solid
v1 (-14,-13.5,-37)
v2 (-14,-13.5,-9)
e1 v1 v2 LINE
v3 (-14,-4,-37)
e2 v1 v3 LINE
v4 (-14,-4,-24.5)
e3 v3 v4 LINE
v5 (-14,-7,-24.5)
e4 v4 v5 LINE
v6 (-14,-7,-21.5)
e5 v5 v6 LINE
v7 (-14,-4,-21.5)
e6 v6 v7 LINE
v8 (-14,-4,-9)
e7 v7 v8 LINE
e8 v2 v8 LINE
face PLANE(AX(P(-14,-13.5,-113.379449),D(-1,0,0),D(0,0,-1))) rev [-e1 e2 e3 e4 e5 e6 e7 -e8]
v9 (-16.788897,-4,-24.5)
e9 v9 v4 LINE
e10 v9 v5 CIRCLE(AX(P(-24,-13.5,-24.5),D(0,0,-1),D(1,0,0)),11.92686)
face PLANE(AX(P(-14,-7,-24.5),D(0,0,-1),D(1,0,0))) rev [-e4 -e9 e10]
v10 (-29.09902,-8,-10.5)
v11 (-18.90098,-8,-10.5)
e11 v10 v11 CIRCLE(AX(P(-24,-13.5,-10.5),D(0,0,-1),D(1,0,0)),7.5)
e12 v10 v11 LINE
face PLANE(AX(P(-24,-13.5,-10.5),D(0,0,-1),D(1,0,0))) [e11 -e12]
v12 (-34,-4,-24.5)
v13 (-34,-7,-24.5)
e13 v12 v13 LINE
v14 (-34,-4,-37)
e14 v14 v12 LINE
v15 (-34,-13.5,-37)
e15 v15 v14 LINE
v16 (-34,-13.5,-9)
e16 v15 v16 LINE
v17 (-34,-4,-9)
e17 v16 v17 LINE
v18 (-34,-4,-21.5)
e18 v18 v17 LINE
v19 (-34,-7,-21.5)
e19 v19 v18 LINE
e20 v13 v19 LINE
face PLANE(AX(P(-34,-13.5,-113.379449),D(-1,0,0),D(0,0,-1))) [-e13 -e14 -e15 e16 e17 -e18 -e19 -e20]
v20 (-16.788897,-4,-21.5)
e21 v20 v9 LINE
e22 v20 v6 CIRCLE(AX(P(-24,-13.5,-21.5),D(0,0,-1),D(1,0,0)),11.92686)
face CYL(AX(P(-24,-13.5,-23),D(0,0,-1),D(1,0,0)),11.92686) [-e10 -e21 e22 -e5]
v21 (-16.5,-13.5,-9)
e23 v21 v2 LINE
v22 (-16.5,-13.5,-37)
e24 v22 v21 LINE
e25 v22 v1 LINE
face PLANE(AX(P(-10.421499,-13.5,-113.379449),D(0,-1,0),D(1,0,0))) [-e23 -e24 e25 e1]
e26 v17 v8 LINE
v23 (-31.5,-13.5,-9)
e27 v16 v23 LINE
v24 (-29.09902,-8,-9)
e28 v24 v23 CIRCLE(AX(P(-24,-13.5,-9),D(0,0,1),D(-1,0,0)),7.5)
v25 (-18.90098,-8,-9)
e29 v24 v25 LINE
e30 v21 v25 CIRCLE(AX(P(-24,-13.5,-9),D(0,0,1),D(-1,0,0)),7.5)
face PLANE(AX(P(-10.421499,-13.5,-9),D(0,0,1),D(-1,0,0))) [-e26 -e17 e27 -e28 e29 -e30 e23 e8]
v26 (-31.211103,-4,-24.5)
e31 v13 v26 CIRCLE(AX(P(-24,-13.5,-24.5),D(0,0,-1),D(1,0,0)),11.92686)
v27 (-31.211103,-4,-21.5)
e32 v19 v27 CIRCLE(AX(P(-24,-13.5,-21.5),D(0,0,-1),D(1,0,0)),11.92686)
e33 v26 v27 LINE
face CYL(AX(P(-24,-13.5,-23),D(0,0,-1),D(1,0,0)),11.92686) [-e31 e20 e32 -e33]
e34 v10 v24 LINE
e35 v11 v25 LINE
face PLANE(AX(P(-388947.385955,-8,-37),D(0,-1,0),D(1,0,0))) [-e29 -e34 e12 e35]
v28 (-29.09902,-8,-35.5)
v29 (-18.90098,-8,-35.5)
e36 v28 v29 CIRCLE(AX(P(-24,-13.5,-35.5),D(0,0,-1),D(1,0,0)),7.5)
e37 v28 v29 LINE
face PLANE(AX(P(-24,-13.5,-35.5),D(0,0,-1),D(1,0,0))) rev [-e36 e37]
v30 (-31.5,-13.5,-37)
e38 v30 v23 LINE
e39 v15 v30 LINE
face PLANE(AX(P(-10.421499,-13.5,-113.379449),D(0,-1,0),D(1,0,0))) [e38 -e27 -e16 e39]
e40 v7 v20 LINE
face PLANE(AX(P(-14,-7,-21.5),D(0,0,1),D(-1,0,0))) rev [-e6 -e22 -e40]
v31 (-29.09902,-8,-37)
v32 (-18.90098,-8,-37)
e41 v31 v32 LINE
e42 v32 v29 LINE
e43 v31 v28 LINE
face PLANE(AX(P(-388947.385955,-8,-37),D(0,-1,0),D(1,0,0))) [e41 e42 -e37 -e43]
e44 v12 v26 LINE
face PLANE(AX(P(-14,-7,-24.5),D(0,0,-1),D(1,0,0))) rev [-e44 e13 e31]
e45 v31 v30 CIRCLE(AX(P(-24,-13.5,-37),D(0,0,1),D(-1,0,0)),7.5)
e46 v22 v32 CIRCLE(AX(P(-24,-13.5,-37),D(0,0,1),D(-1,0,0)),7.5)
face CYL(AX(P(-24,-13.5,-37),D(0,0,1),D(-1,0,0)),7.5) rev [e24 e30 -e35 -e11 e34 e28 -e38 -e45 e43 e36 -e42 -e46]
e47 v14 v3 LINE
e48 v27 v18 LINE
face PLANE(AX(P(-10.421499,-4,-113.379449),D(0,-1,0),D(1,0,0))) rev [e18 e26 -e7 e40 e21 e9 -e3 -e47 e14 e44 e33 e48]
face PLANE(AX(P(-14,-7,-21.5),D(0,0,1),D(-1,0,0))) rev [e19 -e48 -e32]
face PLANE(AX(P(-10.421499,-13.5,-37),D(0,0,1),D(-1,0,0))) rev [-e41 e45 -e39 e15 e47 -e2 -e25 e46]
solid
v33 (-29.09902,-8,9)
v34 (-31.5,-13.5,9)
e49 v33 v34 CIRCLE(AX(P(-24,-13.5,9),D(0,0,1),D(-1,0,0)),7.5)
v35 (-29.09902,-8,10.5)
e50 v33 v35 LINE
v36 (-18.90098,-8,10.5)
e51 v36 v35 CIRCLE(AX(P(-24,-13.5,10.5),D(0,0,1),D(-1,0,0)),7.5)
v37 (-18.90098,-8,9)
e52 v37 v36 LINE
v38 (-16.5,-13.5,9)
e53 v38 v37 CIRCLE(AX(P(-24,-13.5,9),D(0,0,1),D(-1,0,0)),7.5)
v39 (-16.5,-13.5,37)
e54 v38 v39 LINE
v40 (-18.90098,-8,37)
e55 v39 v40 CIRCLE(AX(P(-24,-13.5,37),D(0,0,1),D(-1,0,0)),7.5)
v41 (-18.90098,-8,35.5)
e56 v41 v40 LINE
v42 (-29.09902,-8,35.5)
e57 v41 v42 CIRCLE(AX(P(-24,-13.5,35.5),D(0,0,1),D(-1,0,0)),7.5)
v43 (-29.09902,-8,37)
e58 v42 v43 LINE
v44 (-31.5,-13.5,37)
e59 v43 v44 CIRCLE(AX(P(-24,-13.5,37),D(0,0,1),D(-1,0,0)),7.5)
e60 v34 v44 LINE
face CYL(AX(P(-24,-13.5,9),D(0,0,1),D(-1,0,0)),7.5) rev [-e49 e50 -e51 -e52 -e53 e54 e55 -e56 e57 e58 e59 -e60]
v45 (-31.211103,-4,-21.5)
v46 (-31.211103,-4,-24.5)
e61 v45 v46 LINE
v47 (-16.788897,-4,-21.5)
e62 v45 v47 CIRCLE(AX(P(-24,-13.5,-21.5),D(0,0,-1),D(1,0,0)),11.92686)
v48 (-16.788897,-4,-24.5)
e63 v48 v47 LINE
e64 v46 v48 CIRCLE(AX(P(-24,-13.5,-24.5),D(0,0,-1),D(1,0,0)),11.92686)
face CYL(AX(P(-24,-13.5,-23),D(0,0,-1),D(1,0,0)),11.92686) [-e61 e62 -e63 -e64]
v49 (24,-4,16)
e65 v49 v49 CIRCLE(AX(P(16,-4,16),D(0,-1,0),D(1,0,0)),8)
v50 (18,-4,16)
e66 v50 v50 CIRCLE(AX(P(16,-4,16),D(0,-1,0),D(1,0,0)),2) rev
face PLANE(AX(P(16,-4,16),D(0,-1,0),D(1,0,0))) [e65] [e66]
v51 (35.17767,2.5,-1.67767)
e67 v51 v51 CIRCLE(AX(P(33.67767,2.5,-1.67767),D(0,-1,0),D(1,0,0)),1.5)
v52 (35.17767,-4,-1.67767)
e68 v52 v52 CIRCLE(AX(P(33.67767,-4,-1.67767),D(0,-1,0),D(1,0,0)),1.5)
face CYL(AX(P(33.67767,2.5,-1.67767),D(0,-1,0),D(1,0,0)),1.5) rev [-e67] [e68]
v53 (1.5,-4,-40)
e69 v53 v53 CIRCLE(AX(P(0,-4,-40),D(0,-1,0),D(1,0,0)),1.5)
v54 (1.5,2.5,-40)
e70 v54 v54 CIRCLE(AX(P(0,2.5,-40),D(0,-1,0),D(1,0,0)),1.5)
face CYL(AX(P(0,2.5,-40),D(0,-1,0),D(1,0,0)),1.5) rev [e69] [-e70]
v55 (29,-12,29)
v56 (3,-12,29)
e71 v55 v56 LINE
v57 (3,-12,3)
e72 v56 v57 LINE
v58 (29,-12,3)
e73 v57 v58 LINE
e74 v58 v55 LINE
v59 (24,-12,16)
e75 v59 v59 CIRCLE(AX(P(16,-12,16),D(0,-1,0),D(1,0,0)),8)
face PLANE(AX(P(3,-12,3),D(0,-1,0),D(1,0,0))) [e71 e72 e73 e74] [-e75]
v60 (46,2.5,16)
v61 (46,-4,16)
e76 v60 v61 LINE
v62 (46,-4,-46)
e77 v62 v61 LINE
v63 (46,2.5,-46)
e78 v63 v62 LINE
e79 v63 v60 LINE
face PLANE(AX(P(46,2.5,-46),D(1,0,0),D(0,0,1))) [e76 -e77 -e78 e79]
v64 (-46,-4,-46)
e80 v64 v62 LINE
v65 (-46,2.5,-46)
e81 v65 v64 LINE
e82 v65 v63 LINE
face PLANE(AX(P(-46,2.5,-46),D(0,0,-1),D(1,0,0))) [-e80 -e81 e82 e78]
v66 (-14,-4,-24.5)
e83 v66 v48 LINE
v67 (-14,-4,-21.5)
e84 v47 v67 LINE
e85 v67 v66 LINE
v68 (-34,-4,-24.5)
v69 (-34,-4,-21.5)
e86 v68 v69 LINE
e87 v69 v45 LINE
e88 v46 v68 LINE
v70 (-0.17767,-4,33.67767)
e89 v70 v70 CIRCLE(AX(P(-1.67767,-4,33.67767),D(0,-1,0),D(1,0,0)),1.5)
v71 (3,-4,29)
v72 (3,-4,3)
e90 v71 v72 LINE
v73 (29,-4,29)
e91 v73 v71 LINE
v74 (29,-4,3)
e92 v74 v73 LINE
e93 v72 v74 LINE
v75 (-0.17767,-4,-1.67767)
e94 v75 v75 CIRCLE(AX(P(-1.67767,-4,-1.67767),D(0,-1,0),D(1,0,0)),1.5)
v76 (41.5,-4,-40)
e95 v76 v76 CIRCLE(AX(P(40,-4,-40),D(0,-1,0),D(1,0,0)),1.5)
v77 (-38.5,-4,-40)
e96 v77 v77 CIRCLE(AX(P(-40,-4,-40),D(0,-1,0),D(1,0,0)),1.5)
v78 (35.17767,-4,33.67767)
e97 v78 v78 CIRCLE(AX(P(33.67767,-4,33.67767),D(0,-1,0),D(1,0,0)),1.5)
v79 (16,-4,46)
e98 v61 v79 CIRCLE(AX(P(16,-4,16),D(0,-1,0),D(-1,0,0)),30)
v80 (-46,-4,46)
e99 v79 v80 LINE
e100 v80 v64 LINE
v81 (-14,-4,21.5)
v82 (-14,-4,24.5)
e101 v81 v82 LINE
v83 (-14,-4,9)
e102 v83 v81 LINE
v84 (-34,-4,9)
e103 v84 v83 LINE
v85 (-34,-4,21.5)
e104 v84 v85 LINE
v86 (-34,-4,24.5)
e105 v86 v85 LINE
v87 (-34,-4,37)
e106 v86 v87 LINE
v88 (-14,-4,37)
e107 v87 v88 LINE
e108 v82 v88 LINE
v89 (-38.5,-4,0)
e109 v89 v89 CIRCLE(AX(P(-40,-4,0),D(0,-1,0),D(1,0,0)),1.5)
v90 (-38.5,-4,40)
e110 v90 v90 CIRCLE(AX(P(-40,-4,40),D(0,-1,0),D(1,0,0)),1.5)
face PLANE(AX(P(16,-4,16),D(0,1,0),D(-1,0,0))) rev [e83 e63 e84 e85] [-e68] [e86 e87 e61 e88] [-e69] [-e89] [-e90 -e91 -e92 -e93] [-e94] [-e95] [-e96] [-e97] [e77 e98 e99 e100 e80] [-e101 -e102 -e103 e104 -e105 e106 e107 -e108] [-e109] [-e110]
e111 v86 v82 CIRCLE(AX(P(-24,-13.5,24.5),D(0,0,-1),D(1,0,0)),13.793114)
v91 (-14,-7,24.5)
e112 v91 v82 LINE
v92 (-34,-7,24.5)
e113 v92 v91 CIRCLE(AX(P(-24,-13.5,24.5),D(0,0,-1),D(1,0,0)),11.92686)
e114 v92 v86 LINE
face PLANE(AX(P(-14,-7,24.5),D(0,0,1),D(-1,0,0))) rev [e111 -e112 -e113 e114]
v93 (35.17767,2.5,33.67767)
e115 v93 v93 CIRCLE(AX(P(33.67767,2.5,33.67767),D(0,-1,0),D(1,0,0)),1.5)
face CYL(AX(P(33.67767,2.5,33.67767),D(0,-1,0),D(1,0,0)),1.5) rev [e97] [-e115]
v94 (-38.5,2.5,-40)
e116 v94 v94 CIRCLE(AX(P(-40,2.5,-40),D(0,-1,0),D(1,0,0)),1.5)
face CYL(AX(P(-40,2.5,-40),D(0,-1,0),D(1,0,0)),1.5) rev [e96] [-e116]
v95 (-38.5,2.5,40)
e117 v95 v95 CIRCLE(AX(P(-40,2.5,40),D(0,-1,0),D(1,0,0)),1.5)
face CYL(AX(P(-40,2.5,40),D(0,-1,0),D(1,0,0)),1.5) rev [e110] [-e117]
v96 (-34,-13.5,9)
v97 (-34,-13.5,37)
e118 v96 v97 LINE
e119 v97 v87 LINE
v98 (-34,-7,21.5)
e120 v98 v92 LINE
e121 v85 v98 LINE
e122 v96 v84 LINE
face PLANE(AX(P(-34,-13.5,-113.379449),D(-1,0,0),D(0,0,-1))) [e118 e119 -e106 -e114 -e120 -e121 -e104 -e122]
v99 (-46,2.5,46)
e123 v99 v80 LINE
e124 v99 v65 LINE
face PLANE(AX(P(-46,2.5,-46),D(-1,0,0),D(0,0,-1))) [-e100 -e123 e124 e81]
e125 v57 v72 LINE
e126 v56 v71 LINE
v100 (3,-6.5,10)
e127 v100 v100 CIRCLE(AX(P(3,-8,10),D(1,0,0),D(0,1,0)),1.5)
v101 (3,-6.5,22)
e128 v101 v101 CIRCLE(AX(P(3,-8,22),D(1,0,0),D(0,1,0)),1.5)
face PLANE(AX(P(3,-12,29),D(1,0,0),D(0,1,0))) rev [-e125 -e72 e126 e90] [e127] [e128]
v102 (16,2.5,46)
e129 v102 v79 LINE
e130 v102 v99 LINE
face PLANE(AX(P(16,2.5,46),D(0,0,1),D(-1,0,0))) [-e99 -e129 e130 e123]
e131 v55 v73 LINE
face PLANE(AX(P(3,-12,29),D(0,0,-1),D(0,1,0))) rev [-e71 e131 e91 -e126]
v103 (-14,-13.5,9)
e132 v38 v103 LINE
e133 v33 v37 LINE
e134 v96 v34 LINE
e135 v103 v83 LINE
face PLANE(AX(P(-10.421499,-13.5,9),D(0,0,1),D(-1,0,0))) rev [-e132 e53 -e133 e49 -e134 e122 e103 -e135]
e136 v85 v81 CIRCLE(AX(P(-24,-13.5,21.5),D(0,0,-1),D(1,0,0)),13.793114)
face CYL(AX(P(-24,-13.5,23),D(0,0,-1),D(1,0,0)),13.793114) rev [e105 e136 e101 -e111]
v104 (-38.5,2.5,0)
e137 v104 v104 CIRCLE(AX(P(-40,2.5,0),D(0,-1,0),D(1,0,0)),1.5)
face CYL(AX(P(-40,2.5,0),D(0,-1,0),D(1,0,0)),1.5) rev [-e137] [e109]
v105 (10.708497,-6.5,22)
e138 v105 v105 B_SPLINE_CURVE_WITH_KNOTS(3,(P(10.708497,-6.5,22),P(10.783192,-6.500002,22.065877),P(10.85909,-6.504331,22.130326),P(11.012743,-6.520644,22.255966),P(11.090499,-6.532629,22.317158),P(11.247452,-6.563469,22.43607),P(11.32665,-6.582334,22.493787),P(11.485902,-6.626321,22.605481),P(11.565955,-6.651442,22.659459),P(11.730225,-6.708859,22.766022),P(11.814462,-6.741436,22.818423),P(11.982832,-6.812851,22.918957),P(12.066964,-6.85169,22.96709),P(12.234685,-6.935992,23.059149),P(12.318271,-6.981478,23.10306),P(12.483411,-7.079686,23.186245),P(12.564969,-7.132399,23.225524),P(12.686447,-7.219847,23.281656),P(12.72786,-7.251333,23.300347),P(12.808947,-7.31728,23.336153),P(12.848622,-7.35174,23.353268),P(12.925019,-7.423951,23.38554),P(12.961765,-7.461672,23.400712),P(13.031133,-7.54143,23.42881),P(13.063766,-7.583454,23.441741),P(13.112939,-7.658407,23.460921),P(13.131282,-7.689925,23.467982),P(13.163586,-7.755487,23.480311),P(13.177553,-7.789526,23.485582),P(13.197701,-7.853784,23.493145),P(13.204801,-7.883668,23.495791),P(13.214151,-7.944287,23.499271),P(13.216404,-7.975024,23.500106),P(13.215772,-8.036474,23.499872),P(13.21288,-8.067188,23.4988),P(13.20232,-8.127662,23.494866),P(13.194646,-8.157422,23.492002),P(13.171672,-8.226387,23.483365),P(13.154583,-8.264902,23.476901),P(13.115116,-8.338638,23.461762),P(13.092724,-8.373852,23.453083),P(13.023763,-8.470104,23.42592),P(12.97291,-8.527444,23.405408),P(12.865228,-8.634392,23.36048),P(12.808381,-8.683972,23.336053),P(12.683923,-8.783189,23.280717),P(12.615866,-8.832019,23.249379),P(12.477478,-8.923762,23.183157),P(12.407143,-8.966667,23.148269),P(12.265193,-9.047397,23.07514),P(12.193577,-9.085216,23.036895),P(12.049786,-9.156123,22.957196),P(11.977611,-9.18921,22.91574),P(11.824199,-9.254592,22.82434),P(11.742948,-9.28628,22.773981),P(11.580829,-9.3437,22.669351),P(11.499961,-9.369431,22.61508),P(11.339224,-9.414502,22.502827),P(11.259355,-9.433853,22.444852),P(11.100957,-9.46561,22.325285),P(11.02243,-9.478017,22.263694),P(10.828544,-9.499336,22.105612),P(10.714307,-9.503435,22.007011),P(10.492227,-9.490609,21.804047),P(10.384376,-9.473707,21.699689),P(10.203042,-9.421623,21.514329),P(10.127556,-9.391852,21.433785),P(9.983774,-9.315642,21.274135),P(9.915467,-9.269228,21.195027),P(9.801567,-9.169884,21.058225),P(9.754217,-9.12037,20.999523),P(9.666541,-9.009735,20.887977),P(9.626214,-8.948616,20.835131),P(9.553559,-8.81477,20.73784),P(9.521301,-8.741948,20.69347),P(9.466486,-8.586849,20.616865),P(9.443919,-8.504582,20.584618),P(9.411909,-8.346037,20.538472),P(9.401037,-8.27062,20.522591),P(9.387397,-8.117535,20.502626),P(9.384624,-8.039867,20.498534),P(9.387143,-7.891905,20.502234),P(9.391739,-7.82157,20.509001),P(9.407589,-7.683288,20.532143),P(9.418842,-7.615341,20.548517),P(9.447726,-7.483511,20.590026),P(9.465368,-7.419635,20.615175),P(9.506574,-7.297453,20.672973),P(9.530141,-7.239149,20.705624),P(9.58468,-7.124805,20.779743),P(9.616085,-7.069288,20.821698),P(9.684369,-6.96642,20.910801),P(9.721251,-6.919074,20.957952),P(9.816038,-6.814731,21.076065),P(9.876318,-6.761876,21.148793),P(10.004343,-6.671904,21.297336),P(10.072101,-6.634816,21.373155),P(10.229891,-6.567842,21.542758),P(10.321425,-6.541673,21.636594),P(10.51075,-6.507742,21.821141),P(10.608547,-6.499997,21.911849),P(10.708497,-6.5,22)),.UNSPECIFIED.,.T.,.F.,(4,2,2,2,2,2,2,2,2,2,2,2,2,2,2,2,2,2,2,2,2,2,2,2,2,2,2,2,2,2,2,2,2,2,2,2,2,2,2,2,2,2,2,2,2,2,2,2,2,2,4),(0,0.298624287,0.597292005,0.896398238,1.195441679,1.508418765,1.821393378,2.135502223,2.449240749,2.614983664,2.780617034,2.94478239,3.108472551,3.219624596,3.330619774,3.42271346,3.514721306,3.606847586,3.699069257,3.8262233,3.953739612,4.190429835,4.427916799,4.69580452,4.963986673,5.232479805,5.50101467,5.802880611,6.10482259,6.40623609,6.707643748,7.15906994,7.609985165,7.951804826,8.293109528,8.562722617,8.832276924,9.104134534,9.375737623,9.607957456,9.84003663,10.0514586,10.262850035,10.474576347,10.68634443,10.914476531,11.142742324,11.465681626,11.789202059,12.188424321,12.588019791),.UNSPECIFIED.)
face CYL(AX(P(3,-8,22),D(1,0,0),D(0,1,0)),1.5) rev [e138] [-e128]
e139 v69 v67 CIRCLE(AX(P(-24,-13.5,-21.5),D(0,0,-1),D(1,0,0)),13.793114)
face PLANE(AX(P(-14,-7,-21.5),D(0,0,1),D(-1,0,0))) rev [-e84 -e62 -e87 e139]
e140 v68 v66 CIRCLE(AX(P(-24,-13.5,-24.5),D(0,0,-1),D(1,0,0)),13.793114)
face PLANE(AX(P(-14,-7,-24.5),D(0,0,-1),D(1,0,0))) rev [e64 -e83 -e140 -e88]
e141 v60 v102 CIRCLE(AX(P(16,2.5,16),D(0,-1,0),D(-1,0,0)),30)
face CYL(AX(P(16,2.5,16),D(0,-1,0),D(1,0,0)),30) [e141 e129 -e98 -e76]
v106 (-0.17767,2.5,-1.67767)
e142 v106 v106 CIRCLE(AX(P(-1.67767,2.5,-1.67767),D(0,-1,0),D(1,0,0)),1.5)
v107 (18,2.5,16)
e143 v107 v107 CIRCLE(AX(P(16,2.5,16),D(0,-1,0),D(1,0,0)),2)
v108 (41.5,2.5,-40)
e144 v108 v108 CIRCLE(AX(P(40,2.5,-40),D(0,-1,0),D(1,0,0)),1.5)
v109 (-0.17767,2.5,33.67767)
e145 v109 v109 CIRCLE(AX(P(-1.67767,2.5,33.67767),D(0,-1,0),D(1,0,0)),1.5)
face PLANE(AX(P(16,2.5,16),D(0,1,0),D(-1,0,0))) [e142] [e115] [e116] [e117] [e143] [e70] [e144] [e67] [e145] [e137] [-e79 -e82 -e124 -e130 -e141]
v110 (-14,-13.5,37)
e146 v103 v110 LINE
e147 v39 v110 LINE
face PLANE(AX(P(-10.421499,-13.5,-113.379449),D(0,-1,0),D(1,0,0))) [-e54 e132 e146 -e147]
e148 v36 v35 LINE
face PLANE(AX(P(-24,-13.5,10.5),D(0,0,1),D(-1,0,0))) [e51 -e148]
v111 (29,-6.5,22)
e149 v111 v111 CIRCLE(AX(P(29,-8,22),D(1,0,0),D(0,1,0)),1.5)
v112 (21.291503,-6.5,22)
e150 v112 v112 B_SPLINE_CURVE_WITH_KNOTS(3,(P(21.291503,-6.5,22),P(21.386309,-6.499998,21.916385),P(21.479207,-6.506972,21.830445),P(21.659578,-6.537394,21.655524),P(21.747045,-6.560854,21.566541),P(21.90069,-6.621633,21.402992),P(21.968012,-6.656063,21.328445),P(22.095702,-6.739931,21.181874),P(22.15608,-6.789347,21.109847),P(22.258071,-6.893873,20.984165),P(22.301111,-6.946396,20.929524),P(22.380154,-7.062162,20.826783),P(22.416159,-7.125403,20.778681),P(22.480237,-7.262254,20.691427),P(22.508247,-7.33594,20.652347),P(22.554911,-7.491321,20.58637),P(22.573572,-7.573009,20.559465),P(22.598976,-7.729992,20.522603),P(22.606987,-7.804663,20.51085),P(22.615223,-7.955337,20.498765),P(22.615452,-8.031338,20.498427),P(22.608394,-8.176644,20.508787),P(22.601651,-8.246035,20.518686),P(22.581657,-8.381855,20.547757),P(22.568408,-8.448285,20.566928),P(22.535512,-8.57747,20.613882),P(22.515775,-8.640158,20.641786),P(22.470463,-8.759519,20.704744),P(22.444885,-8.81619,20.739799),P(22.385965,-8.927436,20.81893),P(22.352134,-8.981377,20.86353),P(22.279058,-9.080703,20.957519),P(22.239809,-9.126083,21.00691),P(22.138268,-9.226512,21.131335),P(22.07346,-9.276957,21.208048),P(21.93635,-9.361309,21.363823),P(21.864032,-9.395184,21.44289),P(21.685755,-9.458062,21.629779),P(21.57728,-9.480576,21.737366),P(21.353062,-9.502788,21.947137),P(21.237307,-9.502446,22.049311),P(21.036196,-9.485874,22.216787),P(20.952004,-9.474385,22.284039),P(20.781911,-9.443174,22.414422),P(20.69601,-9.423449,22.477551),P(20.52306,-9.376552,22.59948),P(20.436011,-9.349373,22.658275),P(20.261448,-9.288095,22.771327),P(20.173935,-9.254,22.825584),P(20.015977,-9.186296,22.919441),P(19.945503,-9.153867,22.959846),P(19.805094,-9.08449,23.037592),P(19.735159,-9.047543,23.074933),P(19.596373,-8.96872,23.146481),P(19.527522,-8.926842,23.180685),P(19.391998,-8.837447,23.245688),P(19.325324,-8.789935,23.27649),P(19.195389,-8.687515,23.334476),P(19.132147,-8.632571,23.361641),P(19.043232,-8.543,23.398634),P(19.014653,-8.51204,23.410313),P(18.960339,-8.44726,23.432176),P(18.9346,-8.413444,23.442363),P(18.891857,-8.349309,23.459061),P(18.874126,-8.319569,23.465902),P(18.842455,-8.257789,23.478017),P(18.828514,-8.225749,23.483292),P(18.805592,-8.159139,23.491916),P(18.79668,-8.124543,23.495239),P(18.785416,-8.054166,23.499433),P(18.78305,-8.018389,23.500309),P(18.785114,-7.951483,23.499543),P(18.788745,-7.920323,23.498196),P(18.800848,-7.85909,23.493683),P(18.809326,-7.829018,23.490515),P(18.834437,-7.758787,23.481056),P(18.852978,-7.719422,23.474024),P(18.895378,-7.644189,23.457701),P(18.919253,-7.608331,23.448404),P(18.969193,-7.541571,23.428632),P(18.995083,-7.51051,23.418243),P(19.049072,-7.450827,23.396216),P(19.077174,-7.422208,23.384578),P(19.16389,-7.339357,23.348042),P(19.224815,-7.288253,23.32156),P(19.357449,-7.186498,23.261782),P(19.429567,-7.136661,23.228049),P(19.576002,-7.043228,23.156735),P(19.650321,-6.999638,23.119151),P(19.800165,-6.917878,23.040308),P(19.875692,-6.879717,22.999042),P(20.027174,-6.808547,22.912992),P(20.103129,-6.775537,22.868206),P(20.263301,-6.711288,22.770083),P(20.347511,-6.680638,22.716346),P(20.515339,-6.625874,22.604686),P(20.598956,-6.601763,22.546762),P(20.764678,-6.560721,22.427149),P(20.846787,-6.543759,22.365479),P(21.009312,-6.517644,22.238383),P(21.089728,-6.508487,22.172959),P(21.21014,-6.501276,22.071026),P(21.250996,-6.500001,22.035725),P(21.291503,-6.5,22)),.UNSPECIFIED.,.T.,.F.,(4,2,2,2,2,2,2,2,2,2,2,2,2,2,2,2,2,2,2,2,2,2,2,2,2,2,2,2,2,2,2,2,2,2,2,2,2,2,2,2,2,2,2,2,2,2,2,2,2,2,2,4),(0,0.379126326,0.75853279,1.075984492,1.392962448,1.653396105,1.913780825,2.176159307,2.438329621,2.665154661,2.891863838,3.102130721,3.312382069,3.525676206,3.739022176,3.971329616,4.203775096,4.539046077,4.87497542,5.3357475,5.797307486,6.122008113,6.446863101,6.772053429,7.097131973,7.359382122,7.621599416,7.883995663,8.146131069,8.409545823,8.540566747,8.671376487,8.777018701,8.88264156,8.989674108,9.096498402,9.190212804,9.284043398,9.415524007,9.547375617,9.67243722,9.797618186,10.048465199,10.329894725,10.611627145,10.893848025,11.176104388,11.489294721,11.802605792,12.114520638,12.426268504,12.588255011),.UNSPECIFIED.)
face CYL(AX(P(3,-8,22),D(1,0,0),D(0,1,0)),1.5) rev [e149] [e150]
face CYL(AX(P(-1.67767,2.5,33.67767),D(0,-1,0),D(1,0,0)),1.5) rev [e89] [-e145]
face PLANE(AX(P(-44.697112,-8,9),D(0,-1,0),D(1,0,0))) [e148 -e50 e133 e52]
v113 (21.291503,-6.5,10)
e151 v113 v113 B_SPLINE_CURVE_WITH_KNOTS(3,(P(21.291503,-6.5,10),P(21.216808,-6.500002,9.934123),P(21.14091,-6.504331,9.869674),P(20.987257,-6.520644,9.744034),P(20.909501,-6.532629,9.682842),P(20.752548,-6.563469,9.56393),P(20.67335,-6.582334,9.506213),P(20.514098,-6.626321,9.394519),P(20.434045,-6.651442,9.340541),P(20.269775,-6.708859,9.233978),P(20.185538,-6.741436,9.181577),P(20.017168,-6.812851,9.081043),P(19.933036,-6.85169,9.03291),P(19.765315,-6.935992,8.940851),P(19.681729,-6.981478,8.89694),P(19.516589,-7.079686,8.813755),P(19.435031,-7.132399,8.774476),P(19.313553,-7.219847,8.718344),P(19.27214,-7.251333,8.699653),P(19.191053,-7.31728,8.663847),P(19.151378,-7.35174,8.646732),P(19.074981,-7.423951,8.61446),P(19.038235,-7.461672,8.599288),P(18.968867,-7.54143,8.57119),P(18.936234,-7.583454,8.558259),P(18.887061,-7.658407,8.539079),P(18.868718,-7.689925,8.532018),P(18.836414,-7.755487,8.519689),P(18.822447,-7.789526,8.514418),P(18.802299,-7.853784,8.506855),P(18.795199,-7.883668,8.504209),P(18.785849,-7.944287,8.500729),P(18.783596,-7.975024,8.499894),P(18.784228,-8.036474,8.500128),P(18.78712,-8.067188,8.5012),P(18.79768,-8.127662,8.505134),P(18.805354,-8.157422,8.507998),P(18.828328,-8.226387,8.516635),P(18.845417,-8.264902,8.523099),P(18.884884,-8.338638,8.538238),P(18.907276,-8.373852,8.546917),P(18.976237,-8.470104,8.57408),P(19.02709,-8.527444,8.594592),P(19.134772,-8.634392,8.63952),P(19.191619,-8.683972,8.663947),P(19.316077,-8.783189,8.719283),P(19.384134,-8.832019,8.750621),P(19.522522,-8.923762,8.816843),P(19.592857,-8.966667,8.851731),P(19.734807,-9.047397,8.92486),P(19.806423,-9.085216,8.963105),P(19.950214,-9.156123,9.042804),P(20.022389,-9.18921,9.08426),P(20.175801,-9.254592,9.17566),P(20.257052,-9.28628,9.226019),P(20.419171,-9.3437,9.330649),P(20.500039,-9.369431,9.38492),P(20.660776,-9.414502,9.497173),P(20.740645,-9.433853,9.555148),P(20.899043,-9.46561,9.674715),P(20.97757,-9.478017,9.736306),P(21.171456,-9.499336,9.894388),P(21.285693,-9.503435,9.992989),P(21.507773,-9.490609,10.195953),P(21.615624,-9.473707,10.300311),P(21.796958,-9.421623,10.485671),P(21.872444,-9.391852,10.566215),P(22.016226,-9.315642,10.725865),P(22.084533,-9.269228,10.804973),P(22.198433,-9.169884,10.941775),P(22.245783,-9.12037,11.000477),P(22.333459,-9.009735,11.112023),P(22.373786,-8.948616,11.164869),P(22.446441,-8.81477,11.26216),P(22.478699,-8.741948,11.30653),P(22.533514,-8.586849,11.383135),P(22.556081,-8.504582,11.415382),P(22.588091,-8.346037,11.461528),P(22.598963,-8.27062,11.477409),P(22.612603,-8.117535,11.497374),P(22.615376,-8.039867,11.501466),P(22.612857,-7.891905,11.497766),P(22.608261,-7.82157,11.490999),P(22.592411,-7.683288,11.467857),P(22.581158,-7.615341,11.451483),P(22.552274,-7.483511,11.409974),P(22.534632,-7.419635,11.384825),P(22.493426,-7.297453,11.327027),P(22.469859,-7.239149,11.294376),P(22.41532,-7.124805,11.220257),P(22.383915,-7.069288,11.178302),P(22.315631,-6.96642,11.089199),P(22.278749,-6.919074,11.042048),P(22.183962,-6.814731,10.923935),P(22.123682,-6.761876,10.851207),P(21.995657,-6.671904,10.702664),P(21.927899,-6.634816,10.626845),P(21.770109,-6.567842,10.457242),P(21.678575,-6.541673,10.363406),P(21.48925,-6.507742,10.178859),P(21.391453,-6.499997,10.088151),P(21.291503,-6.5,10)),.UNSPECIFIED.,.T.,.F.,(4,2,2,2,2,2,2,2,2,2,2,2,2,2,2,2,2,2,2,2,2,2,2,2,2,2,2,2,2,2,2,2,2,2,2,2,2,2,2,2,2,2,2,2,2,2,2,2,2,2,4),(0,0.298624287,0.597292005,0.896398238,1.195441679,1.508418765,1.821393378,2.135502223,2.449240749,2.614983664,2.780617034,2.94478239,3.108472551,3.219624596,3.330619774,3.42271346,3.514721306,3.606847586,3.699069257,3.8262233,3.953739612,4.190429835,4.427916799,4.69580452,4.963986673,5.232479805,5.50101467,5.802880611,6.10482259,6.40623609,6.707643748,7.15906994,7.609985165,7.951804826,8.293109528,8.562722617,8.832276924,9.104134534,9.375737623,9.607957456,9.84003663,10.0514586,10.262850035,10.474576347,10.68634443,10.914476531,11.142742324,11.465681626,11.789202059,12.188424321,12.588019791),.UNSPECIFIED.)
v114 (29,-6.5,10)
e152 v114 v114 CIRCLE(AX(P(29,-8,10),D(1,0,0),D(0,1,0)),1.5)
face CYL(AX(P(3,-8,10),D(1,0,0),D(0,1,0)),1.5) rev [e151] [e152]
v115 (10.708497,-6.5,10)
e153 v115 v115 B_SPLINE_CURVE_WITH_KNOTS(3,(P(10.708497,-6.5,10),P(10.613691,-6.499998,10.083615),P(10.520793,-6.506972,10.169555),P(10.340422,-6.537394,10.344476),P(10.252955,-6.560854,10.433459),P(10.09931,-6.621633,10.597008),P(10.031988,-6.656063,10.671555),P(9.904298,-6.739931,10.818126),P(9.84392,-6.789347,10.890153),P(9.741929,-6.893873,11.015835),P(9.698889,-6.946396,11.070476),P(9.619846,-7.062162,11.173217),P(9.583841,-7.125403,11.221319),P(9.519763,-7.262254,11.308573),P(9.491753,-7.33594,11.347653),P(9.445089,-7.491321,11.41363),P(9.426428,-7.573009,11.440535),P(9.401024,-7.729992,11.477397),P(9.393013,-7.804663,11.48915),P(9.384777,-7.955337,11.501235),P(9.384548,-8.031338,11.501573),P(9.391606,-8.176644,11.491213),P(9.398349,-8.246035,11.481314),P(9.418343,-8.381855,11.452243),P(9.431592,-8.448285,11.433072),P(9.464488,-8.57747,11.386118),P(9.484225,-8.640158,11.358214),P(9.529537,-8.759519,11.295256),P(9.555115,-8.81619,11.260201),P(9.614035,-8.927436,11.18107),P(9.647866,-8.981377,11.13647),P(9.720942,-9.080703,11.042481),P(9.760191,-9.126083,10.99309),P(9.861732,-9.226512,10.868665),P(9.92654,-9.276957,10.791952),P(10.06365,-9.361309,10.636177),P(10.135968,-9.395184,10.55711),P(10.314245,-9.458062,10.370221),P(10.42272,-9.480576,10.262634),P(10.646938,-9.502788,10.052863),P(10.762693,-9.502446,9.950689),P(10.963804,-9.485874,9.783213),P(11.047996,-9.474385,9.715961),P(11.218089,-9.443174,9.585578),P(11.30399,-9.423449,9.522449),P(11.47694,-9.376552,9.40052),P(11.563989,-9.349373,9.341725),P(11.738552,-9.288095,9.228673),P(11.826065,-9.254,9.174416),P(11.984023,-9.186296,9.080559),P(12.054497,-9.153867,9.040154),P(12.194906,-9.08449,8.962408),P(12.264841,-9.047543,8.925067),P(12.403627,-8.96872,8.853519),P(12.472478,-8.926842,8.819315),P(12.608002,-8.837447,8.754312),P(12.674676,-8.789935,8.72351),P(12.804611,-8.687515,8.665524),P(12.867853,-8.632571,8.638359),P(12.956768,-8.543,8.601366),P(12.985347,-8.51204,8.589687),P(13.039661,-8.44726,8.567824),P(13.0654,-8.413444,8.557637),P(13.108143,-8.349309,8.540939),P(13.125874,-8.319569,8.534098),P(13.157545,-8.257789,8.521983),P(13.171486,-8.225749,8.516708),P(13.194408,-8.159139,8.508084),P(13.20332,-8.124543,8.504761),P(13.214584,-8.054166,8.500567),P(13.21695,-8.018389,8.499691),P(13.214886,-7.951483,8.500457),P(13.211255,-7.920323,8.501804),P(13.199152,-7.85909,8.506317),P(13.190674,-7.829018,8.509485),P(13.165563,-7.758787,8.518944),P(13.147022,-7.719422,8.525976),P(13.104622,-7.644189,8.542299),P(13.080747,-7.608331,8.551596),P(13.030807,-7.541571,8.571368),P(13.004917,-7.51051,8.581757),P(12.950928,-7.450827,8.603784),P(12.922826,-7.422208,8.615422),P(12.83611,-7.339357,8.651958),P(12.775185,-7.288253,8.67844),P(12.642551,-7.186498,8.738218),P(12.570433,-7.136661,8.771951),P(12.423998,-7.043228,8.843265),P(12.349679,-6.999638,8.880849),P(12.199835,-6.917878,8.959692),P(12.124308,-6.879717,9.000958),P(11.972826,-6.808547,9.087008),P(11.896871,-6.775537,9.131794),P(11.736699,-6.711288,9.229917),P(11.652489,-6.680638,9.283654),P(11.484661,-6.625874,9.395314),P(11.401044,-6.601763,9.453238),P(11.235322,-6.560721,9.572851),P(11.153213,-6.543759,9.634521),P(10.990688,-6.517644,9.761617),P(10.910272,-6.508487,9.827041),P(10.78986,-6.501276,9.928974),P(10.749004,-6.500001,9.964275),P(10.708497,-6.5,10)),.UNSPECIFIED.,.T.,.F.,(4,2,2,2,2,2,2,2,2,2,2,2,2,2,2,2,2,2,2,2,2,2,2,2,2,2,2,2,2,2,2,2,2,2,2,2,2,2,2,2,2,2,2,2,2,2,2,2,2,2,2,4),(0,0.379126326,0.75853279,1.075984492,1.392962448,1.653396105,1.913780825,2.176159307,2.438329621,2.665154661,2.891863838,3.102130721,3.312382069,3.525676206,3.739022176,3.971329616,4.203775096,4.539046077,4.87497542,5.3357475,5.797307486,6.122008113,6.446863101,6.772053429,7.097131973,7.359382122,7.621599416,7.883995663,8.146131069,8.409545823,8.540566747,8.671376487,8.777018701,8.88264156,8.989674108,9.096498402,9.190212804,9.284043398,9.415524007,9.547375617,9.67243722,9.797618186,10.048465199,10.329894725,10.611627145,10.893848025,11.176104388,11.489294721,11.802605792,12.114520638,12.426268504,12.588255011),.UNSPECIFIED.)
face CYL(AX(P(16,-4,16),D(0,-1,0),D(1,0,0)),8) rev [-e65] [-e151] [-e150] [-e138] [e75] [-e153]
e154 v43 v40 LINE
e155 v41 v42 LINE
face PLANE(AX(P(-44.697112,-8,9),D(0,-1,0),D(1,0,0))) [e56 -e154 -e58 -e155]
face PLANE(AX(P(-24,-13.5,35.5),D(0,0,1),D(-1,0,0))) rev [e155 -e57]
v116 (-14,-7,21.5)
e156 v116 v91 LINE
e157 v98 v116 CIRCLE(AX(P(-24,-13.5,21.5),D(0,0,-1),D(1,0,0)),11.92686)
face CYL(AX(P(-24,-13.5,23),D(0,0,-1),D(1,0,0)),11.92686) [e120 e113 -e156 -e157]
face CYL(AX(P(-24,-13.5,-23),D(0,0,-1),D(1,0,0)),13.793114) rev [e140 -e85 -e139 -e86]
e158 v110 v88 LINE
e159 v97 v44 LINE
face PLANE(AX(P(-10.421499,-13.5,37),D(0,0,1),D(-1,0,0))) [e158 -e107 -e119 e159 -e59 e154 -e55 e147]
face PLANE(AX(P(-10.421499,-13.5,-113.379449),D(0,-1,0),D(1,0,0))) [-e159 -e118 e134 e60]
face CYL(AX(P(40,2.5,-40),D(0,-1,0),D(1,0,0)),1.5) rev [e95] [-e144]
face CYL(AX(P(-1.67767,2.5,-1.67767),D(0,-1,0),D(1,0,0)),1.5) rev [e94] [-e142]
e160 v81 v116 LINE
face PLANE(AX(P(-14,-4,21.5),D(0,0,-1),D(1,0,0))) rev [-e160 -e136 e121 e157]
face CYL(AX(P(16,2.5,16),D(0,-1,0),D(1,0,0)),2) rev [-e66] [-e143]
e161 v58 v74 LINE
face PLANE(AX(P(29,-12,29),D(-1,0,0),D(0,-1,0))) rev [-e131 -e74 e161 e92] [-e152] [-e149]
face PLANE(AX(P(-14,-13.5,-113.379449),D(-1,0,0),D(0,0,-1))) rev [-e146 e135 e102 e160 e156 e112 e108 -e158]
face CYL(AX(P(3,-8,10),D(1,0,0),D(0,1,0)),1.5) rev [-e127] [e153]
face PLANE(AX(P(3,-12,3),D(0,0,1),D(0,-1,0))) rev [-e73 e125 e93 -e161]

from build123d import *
from build123d.topology import SkipClean

# Parameters (mm, degrees)
EXTRUDE2_DEPTH          = 4
EXTRUDE2_DEPTH_BACK     = 2.5
SKETCH7_R               = 1.5
SKETCH7_R_2             = 2
SKETCH8_W               = 28
SKETCH8_H               = 20
EXTRUDE3_DEPTH          = 9.5
EXTRUDE6_DEPTH          = 28
SKETCH15_R              = 7.5
EXTRUDE7_DEPTH          = 25
SKETCH16_W              = 3
SKETCH16_H              = 3
SKETCH8_4_W             = 28
SKETCH8_4_H             = 20
EXTRUDE8_DEPTH          = 9.5
EXTRUDE9_DEPTH          = 28
SKETCH19_R              = 7.5
EXTRUDE10_DEPTH         = 25
SKETCH20_W              = 3
SKETCH20_H              = 3
BODY_MOVE_COPY1_ANGLE   = 180
BODY_MOVE_COPY1_2_ANGLE = 180
SKETCH22_W              = 26
SKETCH22_H              = 26
EXTRUDE11_DEPTH         = 8
SKETCH23_R              = 1.5
EXTRUDE12_DEPTH         = 26
SKETCH24_R              = 8
EXTRUDE13_DEPTH         = 8


with BuildPart() as part:
    # Sketch7 → Extrude2 (new, two sides: drawn at the far end of the back side and taken through both)
    with BuildSketch(Plane(origin=(0, 0, 0), x_dir=(1, 0, 0), z_dir=(0, 1, 0)).offset(-EXTRUDE2_DEPTH_BACK)):
        with BuildLine():
            Line((-46, -46), (16, -46))
            ThreePointArc((16, -46), (37.213203436, -37.213203436), (46, -16))
            Line((46, -16), (46, 46))
            Line((46, 46), (-46, 46))
            Line((-46, 46), (-46, -46))
        make_face()
        with Locations(Location((-1.67766953, 1.67766953, 0), (0, 0, 270))):
            Circle(SKETCH7_R, mode=Mode.SUBTRACT)
        with Locations(Location((-40, 40, 0), (0, 0, 270))):
            Circle(SKETCH7_R, mode=Mode.SUBTRACT)
        with Locations(Location((-40, -40, 0), (0, 0, 270))):
            Circle(SKETCH7_R, mode=Mode.SUBTRACT)
        with Locations(Location((40, 40, 0), (0, 0, 270))):
            Circle(SKETCH7_R, mode=Mode.SUBTRACT)
        with Locations(Location((0, 40, 0), (0, 0, 270))):
            Circle(SKETCH7_R, mode=Mode.SUBTRACT)
        with Locations(Location((-40, 0, 0), (0, 0, 270))):
            Circle(SKETCH7_R, mode=Mode.SUBTRACT)
        with Locations(Location((16, -16, 0), (0, 0, 270))):
            Circle(SKETCH7_R_2, mode=Mode.SUBTRACT)
        with Locations(Location((33.67766953, 1.67766953, 0), (0, 0, 270))):
            Circle(SKETCH7_R, mode=Mode.SUBTRACT)
        with Locations(Location((33.67766953, -33.67766953, 0), (0, 0, 270))):
            Circle(SKETCH7_R, mode=Mode.SUBTRACT)
        with Locations(Location((-1.67766953, -33.67766953, 0), (0, 0, 270))):
            Circle(SKETCH7_R, mode=Mode.SUBTRACT)
    extrude(amount=EXTRUDE2_DEPTH + EXTRUDE2_DEPTH_BACK)


with BuildPart() as body_2:
    # Sketch8 → Extrude3 (new body)
    with BuildSketch(Plane(origin=(0, 4, 0), x_dir=(1, 0, 0), z_dir=(0, 1, 0))):
        with Locations((-23, 24)):
            Rectangle(SKETCH8_W, SKETCH8_H)
    extrude(amount=EXTRUDE3_DEPTH)

    # Sketch10 → Extrude6 (cut)
    with BuildSketch(Plane(origin=(-9, 0, 0), x_dir=(0, 0, -1), z_dir=(1, 0, 0))):
        with BuildLine():
            Line((31.5, 13.5), (24, 13.5))
            Line((24, 13.5), (16.5, 13.5))
            ThreePointArc((16.5, 13.5), (17.126403912, 10.499387259), (18.900980486, 8))
            Line((18.900980486, 8), (29.099019514, 8))
            ThreePointArc((29.099019514, 8), (30.873596088, 10.499387259), (31.5, 13.5))
        make_face()
    extrude(amount=-EXTRUDE6_DEPTH, mode=Mode.SUBTRACT)

    # Sketch15 → Extrude7 (cut)
    with SkipClean():  # the faces are left unmerged after this step: merging them gives an invalid solid
        with BuildSketch(Plane.ZY.offset(35.5)):
            with Locations((-24, 13.5)):
                Circle(SKETCH15_R)
        extrude(amount=-EXTRUDE7_DEPTH, mode=Mode.SUBTRACT)


with BuildPart() as cut_sweep1_tool:
    # Cut-Sweep1: sweep along a path in Sketch17
    with SkipClean():  # the faces are left unmerged after this step: merging them gives an invalid solid
        with BuildLine(Plane(origin=(-23, 0, 0), x_dir=(0, 0, -1), z_dir=(1, 0, 0))) as cut_sweep1_path:
            CenterArc((24, 13.5), 12.806248475, 0, 360)
        # Sketch16 → Cut-Sweep1 (sweep)
        with BuildSketch(Plane.XY.offset(-14)):
            with Locations((-23, 5.5)):
                Rectangle(SKETCH16_W, SKETCH16_H)
        sweep(path=cut_sweep1_path.line)


with BuildPart() as part_1:
    with SkipClean():  # the faces are left unmerged after this step: merging them gives an invalid solid
        add(part.part)

        # Cut-Sweep1: cut by cut_sweep1_tool
        add(cut_sweep1_tool.part, mode=Mode.SUBTRACT)

    # Sketch8<4> → Extrude8 (add)
    with BuildSketch(Plane(origin=(0, 4, 0), x_dir=(1, 0, 0), z_dir=(0, 1, 0))):
        with Locations((23, 24)):
            Rectangle(SKETCH8_4_W, SKETCH8_4_H)
    extrude(amount=EXTRUDE8_DEPTH)

    # Sketch18 → Extrude9 (cut)
    with BuildSketch(Plane(origin=(37, 0, 0), x_dir=(0, 0, -1), z_dir=(1, 0, 0))):
        with BuildLine():
            Line((18.900980486, 8), (29.099019514, 8))
            ThreePointArc((29.099019514, 8), (30.873596088, 10.499387259), (31.5, 13.5))
            Line((31.5, 13.5), (16.5, 13.5))
            ThreePointArc((16.5, 13.5), (17.126403912, 10.499387259), (18.900980486, 8))
        make_face()
    extrude(amount=-EXTRUDE9_DEPTH, mode=Mode.SUBTRACT)

    # Sketch19 → Extrude10 (cut)
    with BuildSketch(Plane(origin=(35.5, 0, 0), x_dir=(0, 0, -1), z_dir=(1, 0, 0))):
        with Locations((24, 13.5)):
            Circle(SKETCH19_R)
    extrude(amount=-EXTRUDE10_DEPTH, mode=Mode.SUBTRACT)

    # Cut-Sweep2: sweep along a path in Sketch21
    with BuildLine(Plane(origin=(23, 0, 0), x_dir=(0, 0, -1), z_dir=(1, 0, 0))) as cut_sweep2_path:
        CenterArc((24, 13.5), 12.806248475, 0, 360)
    # Sketch20 → Cut-Sweep2 (sweep, cut)
    with BuildSketch(Plane.XY.offset(-14)):
        with Locations((23, 5.5)):
            Rectangle(SKETCH20_W, SKETCH20_H)
    sweep(path=cut_sweep2_path.line, mode=Mode.SUBTRACT)


with BuildPart() as body_2_1:
    with SkipClean():  # the faces are left unmerged after this step: merging them gives an invalid solid
        add(body_2.part)

        # Cut-Sweep1: cut by cut_sweep1_tool
        add(cut_sweep1_tool.part, mode=Mode.SUBTRACT)


with BuildPart() as body_2_2:
    # Body-Move/Copy1: read off the stored shape, not the designer's step
    # Body-Move/Copy1: moved
    add(body_2_1.part.rotate(Axis((0, 0, 0), (0.7071067812, 0, 0.7071067812)), BODY_MOVE_COPY1_ANGLE))


with BuildPart() as part_2:
    # Body-Move_Copy1 2: moved
    add(part_1.part.rotate(Axis((0, 0, 0), (0.7071067812, 0, 0.7071067812)), BODY_MOVE_COPY1_2_ANGLE))

    # Sketch22 → Extrude11 (add)
    with BuildSketch(Plane.XZ.offset(4)):
        with Locations((16, 16)):
            Rectangle(SKETCH22_W, SKETCH22_H)
    extrude(amount=EXTRUDE11_DEPTH)

    # Sketch23 → Extrude12 (cut)
    with BuildSketch(Plane(origin=(29, 0, 0), x_dir=(0, 0, -1), z_dir=(1, 0, 0))):
        with Locations(Location((-22, -8, 0), (0, 0, 90))):
            Circle(SKETCH23_R)
        with Locations(Location((-10, -8, 0), (0, 0, 90))):
            Circle(SKETCH23_R)
    extrude(amount=-EXTRUDE12_DEPTH, mode=Mode.SUBTRACT)

    # Sketch24 → Extrude13 (cut)
    with BuildSketch(Plane.XZ.offset(12)):
        with Locations((16, 16)):
            Circle(SKETCH24_R)
    extrude(amount=-EXTRUDE13_DEPTH, mode=Mode.SUBTRACT)


solid = Compound([body_2_2.part, part_2.part])
